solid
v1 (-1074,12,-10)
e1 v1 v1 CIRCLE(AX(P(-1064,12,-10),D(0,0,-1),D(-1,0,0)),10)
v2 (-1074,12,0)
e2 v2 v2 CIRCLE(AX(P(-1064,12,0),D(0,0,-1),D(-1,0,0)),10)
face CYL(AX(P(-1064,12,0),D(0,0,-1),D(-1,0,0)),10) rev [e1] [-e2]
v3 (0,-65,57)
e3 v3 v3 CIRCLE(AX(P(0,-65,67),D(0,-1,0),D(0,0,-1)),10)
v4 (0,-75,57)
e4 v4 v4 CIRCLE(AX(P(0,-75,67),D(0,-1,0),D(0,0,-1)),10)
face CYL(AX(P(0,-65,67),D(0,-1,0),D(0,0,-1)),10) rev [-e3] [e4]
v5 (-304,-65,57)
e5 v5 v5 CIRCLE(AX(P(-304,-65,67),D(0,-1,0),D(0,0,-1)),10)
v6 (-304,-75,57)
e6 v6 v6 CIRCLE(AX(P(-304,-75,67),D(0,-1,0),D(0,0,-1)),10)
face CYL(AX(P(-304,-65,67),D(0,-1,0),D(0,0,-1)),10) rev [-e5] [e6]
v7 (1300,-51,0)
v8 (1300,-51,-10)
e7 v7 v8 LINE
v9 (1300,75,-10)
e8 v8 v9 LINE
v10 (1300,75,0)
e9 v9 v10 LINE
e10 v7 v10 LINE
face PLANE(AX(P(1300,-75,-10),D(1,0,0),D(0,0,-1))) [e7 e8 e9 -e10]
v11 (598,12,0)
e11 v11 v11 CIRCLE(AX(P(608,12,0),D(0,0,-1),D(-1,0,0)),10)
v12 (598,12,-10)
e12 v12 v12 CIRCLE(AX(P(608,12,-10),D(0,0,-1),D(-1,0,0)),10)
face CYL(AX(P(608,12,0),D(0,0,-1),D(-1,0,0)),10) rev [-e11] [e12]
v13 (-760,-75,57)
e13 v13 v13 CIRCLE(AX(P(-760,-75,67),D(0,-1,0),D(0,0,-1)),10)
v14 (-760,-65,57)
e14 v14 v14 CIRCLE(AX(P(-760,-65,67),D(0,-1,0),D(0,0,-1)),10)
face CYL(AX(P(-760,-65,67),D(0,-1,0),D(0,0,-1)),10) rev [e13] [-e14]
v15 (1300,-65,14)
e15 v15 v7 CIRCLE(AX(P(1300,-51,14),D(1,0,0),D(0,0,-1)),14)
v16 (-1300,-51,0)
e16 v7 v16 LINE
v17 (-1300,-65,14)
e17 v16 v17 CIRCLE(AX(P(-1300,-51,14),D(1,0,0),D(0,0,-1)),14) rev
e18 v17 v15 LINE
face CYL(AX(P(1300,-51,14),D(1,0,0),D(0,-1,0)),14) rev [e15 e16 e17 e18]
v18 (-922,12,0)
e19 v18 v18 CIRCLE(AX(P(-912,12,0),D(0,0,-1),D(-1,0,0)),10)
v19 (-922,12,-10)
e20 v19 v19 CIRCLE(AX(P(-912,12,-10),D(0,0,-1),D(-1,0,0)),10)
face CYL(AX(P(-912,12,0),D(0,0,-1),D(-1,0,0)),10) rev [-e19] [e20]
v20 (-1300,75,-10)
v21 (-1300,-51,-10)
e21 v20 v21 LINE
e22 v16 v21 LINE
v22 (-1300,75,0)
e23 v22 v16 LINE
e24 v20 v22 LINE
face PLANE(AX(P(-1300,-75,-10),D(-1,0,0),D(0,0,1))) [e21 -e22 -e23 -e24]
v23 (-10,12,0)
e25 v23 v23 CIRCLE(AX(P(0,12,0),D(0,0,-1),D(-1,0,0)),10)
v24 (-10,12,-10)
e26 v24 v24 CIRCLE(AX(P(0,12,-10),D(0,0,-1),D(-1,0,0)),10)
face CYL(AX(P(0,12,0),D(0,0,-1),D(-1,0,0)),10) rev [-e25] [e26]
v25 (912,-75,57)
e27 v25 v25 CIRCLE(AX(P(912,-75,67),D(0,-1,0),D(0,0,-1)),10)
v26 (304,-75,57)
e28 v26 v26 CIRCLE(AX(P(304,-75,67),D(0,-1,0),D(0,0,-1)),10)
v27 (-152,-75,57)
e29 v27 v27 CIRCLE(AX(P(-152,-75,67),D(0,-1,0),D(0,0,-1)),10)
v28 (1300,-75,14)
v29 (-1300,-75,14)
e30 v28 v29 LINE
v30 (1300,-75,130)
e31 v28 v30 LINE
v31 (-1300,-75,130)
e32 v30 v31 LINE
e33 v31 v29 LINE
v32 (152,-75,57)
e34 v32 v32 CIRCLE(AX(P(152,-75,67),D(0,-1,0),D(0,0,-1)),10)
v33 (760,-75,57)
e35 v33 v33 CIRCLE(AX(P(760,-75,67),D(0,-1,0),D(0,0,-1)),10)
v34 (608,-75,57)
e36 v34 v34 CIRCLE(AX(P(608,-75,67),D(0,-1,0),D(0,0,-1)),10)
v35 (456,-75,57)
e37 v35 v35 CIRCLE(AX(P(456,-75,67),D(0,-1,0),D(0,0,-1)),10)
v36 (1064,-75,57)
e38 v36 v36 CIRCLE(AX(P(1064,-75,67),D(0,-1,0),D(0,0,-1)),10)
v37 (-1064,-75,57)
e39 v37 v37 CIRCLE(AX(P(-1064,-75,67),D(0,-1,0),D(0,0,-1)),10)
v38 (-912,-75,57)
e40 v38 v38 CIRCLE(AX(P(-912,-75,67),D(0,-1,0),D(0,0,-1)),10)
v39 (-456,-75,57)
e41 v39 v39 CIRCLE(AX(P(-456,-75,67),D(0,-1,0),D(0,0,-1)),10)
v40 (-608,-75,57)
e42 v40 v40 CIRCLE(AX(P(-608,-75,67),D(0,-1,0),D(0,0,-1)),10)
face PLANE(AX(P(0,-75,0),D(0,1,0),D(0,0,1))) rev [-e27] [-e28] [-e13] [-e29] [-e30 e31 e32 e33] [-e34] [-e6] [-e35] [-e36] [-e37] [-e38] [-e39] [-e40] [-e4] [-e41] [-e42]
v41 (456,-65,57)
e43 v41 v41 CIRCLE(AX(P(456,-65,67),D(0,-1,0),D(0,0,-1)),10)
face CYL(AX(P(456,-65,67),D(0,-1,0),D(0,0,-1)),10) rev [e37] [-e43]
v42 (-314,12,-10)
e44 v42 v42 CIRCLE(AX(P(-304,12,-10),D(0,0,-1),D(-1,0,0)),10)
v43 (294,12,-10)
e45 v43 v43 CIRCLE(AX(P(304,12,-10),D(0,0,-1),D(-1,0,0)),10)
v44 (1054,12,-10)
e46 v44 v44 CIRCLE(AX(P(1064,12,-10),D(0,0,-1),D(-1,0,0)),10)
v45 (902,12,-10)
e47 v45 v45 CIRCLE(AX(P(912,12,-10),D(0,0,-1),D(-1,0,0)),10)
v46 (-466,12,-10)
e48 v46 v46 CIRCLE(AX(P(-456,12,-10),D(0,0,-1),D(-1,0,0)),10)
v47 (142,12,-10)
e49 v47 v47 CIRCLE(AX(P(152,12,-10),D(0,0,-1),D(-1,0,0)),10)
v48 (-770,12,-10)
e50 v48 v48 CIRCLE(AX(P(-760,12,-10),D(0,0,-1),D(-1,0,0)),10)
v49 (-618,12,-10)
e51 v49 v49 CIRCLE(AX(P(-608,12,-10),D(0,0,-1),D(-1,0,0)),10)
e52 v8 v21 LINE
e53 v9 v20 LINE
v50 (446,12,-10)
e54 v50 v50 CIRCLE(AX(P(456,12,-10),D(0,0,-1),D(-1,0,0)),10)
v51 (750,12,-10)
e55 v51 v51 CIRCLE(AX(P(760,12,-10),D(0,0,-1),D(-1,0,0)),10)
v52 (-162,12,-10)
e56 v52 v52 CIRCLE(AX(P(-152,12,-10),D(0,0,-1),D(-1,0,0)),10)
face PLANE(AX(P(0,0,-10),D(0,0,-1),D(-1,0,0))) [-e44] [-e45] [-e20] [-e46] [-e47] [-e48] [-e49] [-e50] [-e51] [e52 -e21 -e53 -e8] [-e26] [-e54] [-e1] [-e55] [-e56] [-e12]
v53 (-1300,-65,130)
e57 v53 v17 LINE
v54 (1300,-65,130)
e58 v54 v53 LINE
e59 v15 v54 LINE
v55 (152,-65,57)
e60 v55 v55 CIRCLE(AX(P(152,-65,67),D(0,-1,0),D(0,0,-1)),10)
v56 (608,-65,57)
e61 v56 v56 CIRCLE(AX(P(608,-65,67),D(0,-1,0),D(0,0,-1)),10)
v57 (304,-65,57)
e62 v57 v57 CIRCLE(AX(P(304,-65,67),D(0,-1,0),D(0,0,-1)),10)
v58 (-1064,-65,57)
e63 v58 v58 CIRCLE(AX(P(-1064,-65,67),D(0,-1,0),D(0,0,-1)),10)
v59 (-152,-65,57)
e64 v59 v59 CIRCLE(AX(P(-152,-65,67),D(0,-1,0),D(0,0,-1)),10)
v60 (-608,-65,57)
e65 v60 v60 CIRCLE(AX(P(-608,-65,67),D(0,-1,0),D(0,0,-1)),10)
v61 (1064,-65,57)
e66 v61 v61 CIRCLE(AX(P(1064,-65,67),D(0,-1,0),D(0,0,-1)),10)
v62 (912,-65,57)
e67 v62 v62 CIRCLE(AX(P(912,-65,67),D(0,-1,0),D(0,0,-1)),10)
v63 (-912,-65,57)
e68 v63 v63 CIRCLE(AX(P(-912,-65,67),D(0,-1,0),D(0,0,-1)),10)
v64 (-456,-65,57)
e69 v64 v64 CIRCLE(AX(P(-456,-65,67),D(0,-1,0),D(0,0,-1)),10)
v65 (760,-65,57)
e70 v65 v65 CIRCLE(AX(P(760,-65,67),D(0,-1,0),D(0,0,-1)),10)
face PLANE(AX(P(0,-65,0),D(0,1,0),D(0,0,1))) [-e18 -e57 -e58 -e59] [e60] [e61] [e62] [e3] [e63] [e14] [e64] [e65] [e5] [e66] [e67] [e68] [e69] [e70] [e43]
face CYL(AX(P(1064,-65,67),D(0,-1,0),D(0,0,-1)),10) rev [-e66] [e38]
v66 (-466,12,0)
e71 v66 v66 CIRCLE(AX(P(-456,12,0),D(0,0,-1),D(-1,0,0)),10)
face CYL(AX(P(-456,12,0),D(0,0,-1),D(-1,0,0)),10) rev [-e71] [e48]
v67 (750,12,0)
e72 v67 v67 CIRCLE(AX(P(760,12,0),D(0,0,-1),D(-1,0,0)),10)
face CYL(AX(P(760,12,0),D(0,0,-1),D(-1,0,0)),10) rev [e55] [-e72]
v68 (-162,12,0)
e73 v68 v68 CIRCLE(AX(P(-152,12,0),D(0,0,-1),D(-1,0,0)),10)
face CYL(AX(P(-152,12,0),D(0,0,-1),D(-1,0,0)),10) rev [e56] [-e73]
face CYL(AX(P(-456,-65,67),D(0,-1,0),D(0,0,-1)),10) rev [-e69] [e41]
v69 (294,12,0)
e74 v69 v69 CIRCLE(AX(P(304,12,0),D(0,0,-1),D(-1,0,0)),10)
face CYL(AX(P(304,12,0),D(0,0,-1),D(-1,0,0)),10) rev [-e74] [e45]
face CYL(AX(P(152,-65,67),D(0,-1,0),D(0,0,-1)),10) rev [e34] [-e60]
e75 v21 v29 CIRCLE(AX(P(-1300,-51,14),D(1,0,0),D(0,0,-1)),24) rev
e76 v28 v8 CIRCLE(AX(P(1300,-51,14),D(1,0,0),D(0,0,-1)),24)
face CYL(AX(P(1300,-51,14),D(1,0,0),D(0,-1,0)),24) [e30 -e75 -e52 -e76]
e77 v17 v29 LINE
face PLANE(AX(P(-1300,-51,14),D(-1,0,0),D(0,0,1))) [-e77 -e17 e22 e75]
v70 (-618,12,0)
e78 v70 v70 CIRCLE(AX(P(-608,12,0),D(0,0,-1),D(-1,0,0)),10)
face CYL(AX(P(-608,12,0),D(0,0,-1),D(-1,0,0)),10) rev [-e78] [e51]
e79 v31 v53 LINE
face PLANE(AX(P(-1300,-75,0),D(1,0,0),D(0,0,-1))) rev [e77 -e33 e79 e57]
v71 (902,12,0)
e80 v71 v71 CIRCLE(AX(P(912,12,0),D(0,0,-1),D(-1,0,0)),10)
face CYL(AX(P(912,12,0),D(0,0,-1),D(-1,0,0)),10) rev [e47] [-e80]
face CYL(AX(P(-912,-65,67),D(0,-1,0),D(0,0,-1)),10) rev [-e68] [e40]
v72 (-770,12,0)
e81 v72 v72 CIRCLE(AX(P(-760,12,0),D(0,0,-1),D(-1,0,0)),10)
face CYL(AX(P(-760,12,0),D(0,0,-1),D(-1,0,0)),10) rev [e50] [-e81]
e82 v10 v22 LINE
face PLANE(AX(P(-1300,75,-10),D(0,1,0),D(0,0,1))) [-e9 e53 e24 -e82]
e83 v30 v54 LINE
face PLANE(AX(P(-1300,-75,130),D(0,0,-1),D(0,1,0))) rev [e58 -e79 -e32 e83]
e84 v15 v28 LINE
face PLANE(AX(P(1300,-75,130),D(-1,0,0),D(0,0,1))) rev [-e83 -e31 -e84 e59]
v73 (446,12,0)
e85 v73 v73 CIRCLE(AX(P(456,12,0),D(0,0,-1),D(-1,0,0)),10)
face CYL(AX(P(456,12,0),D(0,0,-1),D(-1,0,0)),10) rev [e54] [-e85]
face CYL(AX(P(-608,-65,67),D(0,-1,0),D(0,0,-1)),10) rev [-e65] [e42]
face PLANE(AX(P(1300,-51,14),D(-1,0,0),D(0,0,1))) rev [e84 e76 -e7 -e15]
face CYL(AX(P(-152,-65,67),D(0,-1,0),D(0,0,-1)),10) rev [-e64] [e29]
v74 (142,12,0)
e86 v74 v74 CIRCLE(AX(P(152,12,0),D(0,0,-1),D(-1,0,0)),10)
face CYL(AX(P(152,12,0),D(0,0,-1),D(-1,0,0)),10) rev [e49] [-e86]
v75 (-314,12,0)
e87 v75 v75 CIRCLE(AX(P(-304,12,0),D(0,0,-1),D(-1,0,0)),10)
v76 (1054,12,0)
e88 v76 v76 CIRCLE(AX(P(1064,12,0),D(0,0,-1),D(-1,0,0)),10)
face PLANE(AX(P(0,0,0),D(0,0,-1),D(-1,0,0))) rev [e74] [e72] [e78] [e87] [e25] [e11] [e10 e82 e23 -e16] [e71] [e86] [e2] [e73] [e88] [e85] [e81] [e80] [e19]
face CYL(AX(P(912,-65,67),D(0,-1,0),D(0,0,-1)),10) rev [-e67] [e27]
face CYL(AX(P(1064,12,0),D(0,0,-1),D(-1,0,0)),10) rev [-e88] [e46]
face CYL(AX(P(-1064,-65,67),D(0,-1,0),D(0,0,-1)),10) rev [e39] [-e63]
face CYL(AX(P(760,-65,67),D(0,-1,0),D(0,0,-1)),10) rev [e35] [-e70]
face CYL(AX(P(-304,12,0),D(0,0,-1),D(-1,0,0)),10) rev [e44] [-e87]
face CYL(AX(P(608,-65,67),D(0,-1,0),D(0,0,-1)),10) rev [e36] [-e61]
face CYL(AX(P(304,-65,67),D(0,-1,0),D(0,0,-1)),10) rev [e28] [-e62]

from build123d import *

# Parameters (mm, degrees)
SKETCH1_W                    = 2600
SKETCH1_H                    = 150
BASE_FLANGE1_DEPTH           = 10
EDGE_FLANGE1_STRIP_W         = 68
EDGE_FLANGE1_STRIP_H         = 10
EDGE_FLANGE1_STRIP_CUT_DEPTH = 2600
EDGE_FLANGE1_DEPTH           = 2600
SKETCH12_R                   = 10
CUT_EXTRUDE1_DEPTH           = 10
SKETCH13_R                   = 10
CUT_EXTRUDE2_DEPTH           = 10
LPATTERN1_COUNT              = 15
LPATTERN1_PITCH              = 152


# Sheet-metal steps are written as plain solids
with BuildPart() as part:
    # Sketch1 → Base-Flange1 (new body)
    with BuildSketch(Plane.XY):
        Rectangle(SKETCH1_W, SKETCH1_H)
    extrude(amount=-BASE_FLANGE1_DEPTH)

    # Edge-Flange1 strip (across the edge) → Edge-Flange1 strip cut (cut)
    with BuildSketch(Plane(origin=(-1300, -75, 0), x_dir=(0, 1, 0), z_dir=(1, 0, 0))):
        with Locations((-10, -5)):
            Rectangle(EDGE_FLANGE1_STRIP_W, EDGE_FLANGE1_STRIP_H)
    extrude(amount=EDGE_FLANGE1_STRIP_CUT_DEPTH, mode=Mode.SUBTRACT)

    # Edge-Flange1 section (across the edge) → Edge-Flange1 (add)
    with BuildSketch(Plane(origin=(-1300, -75, 0), x_dir=(0, 1, 0), z_dir=(1, 0, 0))):
        with BuildLine():
            Line((0, 14), (0, 130))
            Line((0, 130), (10, 130))
            Line((10, 130), (10, 14))
            ThreePointArc((10, 14), (14.100505063, 4.100505063), (24, 0))
            Line((24, 0), (24, -10))
            ThreePointArc((24, -10), (7.029437252, -2.970562748), (0, 14))
        make_face()
    extrude(amount=EDGE_FLANGE1_DEPTH)

    # Sketch12 → Cut-Extrude1 (cut)
    with BuildSketch(Plane(origin=(0, -75, 0), x_dir=(-1, 0, 0), z_dir=(0, -1, 0))):
        with Locations(Location((1064, -67, 0), (0, 0, 90))):
            Circle(SKETCH12_R)
    cut_extrude1 = extrude(amount=-CUT_EXTRUDE1_DEPTH, mode=Mode.SUBTRACT)

    # Sketch13 → Cut-Extrude2 (cut)
    with BuildSketch(Plane(origin=(0, 0, -10), x_dir=(-1, 0, 0), z_dir=(0, 0, -1))):
        with Locations((1064, 12)):
            Circle(SKETCH13_R)
    cut_extrude2 = extrude(amount=-CUT_EXTRUDE2_DEPTH, mode=Mode.SUBTRACT)

    # LPattern1: Cut-Extrude1, Cut-Extrude2 ×15
    with Locations(*[(i * LPATTERN1_PITCH, 0, 0) for i in range(1, LPATTERN1_COUNT)]):
        add(cut_extrude1, mode=Mode.SUBTRACT)
        add(cut_extrude2, mode=Mode.SUBTRACT)


solid = part.part
